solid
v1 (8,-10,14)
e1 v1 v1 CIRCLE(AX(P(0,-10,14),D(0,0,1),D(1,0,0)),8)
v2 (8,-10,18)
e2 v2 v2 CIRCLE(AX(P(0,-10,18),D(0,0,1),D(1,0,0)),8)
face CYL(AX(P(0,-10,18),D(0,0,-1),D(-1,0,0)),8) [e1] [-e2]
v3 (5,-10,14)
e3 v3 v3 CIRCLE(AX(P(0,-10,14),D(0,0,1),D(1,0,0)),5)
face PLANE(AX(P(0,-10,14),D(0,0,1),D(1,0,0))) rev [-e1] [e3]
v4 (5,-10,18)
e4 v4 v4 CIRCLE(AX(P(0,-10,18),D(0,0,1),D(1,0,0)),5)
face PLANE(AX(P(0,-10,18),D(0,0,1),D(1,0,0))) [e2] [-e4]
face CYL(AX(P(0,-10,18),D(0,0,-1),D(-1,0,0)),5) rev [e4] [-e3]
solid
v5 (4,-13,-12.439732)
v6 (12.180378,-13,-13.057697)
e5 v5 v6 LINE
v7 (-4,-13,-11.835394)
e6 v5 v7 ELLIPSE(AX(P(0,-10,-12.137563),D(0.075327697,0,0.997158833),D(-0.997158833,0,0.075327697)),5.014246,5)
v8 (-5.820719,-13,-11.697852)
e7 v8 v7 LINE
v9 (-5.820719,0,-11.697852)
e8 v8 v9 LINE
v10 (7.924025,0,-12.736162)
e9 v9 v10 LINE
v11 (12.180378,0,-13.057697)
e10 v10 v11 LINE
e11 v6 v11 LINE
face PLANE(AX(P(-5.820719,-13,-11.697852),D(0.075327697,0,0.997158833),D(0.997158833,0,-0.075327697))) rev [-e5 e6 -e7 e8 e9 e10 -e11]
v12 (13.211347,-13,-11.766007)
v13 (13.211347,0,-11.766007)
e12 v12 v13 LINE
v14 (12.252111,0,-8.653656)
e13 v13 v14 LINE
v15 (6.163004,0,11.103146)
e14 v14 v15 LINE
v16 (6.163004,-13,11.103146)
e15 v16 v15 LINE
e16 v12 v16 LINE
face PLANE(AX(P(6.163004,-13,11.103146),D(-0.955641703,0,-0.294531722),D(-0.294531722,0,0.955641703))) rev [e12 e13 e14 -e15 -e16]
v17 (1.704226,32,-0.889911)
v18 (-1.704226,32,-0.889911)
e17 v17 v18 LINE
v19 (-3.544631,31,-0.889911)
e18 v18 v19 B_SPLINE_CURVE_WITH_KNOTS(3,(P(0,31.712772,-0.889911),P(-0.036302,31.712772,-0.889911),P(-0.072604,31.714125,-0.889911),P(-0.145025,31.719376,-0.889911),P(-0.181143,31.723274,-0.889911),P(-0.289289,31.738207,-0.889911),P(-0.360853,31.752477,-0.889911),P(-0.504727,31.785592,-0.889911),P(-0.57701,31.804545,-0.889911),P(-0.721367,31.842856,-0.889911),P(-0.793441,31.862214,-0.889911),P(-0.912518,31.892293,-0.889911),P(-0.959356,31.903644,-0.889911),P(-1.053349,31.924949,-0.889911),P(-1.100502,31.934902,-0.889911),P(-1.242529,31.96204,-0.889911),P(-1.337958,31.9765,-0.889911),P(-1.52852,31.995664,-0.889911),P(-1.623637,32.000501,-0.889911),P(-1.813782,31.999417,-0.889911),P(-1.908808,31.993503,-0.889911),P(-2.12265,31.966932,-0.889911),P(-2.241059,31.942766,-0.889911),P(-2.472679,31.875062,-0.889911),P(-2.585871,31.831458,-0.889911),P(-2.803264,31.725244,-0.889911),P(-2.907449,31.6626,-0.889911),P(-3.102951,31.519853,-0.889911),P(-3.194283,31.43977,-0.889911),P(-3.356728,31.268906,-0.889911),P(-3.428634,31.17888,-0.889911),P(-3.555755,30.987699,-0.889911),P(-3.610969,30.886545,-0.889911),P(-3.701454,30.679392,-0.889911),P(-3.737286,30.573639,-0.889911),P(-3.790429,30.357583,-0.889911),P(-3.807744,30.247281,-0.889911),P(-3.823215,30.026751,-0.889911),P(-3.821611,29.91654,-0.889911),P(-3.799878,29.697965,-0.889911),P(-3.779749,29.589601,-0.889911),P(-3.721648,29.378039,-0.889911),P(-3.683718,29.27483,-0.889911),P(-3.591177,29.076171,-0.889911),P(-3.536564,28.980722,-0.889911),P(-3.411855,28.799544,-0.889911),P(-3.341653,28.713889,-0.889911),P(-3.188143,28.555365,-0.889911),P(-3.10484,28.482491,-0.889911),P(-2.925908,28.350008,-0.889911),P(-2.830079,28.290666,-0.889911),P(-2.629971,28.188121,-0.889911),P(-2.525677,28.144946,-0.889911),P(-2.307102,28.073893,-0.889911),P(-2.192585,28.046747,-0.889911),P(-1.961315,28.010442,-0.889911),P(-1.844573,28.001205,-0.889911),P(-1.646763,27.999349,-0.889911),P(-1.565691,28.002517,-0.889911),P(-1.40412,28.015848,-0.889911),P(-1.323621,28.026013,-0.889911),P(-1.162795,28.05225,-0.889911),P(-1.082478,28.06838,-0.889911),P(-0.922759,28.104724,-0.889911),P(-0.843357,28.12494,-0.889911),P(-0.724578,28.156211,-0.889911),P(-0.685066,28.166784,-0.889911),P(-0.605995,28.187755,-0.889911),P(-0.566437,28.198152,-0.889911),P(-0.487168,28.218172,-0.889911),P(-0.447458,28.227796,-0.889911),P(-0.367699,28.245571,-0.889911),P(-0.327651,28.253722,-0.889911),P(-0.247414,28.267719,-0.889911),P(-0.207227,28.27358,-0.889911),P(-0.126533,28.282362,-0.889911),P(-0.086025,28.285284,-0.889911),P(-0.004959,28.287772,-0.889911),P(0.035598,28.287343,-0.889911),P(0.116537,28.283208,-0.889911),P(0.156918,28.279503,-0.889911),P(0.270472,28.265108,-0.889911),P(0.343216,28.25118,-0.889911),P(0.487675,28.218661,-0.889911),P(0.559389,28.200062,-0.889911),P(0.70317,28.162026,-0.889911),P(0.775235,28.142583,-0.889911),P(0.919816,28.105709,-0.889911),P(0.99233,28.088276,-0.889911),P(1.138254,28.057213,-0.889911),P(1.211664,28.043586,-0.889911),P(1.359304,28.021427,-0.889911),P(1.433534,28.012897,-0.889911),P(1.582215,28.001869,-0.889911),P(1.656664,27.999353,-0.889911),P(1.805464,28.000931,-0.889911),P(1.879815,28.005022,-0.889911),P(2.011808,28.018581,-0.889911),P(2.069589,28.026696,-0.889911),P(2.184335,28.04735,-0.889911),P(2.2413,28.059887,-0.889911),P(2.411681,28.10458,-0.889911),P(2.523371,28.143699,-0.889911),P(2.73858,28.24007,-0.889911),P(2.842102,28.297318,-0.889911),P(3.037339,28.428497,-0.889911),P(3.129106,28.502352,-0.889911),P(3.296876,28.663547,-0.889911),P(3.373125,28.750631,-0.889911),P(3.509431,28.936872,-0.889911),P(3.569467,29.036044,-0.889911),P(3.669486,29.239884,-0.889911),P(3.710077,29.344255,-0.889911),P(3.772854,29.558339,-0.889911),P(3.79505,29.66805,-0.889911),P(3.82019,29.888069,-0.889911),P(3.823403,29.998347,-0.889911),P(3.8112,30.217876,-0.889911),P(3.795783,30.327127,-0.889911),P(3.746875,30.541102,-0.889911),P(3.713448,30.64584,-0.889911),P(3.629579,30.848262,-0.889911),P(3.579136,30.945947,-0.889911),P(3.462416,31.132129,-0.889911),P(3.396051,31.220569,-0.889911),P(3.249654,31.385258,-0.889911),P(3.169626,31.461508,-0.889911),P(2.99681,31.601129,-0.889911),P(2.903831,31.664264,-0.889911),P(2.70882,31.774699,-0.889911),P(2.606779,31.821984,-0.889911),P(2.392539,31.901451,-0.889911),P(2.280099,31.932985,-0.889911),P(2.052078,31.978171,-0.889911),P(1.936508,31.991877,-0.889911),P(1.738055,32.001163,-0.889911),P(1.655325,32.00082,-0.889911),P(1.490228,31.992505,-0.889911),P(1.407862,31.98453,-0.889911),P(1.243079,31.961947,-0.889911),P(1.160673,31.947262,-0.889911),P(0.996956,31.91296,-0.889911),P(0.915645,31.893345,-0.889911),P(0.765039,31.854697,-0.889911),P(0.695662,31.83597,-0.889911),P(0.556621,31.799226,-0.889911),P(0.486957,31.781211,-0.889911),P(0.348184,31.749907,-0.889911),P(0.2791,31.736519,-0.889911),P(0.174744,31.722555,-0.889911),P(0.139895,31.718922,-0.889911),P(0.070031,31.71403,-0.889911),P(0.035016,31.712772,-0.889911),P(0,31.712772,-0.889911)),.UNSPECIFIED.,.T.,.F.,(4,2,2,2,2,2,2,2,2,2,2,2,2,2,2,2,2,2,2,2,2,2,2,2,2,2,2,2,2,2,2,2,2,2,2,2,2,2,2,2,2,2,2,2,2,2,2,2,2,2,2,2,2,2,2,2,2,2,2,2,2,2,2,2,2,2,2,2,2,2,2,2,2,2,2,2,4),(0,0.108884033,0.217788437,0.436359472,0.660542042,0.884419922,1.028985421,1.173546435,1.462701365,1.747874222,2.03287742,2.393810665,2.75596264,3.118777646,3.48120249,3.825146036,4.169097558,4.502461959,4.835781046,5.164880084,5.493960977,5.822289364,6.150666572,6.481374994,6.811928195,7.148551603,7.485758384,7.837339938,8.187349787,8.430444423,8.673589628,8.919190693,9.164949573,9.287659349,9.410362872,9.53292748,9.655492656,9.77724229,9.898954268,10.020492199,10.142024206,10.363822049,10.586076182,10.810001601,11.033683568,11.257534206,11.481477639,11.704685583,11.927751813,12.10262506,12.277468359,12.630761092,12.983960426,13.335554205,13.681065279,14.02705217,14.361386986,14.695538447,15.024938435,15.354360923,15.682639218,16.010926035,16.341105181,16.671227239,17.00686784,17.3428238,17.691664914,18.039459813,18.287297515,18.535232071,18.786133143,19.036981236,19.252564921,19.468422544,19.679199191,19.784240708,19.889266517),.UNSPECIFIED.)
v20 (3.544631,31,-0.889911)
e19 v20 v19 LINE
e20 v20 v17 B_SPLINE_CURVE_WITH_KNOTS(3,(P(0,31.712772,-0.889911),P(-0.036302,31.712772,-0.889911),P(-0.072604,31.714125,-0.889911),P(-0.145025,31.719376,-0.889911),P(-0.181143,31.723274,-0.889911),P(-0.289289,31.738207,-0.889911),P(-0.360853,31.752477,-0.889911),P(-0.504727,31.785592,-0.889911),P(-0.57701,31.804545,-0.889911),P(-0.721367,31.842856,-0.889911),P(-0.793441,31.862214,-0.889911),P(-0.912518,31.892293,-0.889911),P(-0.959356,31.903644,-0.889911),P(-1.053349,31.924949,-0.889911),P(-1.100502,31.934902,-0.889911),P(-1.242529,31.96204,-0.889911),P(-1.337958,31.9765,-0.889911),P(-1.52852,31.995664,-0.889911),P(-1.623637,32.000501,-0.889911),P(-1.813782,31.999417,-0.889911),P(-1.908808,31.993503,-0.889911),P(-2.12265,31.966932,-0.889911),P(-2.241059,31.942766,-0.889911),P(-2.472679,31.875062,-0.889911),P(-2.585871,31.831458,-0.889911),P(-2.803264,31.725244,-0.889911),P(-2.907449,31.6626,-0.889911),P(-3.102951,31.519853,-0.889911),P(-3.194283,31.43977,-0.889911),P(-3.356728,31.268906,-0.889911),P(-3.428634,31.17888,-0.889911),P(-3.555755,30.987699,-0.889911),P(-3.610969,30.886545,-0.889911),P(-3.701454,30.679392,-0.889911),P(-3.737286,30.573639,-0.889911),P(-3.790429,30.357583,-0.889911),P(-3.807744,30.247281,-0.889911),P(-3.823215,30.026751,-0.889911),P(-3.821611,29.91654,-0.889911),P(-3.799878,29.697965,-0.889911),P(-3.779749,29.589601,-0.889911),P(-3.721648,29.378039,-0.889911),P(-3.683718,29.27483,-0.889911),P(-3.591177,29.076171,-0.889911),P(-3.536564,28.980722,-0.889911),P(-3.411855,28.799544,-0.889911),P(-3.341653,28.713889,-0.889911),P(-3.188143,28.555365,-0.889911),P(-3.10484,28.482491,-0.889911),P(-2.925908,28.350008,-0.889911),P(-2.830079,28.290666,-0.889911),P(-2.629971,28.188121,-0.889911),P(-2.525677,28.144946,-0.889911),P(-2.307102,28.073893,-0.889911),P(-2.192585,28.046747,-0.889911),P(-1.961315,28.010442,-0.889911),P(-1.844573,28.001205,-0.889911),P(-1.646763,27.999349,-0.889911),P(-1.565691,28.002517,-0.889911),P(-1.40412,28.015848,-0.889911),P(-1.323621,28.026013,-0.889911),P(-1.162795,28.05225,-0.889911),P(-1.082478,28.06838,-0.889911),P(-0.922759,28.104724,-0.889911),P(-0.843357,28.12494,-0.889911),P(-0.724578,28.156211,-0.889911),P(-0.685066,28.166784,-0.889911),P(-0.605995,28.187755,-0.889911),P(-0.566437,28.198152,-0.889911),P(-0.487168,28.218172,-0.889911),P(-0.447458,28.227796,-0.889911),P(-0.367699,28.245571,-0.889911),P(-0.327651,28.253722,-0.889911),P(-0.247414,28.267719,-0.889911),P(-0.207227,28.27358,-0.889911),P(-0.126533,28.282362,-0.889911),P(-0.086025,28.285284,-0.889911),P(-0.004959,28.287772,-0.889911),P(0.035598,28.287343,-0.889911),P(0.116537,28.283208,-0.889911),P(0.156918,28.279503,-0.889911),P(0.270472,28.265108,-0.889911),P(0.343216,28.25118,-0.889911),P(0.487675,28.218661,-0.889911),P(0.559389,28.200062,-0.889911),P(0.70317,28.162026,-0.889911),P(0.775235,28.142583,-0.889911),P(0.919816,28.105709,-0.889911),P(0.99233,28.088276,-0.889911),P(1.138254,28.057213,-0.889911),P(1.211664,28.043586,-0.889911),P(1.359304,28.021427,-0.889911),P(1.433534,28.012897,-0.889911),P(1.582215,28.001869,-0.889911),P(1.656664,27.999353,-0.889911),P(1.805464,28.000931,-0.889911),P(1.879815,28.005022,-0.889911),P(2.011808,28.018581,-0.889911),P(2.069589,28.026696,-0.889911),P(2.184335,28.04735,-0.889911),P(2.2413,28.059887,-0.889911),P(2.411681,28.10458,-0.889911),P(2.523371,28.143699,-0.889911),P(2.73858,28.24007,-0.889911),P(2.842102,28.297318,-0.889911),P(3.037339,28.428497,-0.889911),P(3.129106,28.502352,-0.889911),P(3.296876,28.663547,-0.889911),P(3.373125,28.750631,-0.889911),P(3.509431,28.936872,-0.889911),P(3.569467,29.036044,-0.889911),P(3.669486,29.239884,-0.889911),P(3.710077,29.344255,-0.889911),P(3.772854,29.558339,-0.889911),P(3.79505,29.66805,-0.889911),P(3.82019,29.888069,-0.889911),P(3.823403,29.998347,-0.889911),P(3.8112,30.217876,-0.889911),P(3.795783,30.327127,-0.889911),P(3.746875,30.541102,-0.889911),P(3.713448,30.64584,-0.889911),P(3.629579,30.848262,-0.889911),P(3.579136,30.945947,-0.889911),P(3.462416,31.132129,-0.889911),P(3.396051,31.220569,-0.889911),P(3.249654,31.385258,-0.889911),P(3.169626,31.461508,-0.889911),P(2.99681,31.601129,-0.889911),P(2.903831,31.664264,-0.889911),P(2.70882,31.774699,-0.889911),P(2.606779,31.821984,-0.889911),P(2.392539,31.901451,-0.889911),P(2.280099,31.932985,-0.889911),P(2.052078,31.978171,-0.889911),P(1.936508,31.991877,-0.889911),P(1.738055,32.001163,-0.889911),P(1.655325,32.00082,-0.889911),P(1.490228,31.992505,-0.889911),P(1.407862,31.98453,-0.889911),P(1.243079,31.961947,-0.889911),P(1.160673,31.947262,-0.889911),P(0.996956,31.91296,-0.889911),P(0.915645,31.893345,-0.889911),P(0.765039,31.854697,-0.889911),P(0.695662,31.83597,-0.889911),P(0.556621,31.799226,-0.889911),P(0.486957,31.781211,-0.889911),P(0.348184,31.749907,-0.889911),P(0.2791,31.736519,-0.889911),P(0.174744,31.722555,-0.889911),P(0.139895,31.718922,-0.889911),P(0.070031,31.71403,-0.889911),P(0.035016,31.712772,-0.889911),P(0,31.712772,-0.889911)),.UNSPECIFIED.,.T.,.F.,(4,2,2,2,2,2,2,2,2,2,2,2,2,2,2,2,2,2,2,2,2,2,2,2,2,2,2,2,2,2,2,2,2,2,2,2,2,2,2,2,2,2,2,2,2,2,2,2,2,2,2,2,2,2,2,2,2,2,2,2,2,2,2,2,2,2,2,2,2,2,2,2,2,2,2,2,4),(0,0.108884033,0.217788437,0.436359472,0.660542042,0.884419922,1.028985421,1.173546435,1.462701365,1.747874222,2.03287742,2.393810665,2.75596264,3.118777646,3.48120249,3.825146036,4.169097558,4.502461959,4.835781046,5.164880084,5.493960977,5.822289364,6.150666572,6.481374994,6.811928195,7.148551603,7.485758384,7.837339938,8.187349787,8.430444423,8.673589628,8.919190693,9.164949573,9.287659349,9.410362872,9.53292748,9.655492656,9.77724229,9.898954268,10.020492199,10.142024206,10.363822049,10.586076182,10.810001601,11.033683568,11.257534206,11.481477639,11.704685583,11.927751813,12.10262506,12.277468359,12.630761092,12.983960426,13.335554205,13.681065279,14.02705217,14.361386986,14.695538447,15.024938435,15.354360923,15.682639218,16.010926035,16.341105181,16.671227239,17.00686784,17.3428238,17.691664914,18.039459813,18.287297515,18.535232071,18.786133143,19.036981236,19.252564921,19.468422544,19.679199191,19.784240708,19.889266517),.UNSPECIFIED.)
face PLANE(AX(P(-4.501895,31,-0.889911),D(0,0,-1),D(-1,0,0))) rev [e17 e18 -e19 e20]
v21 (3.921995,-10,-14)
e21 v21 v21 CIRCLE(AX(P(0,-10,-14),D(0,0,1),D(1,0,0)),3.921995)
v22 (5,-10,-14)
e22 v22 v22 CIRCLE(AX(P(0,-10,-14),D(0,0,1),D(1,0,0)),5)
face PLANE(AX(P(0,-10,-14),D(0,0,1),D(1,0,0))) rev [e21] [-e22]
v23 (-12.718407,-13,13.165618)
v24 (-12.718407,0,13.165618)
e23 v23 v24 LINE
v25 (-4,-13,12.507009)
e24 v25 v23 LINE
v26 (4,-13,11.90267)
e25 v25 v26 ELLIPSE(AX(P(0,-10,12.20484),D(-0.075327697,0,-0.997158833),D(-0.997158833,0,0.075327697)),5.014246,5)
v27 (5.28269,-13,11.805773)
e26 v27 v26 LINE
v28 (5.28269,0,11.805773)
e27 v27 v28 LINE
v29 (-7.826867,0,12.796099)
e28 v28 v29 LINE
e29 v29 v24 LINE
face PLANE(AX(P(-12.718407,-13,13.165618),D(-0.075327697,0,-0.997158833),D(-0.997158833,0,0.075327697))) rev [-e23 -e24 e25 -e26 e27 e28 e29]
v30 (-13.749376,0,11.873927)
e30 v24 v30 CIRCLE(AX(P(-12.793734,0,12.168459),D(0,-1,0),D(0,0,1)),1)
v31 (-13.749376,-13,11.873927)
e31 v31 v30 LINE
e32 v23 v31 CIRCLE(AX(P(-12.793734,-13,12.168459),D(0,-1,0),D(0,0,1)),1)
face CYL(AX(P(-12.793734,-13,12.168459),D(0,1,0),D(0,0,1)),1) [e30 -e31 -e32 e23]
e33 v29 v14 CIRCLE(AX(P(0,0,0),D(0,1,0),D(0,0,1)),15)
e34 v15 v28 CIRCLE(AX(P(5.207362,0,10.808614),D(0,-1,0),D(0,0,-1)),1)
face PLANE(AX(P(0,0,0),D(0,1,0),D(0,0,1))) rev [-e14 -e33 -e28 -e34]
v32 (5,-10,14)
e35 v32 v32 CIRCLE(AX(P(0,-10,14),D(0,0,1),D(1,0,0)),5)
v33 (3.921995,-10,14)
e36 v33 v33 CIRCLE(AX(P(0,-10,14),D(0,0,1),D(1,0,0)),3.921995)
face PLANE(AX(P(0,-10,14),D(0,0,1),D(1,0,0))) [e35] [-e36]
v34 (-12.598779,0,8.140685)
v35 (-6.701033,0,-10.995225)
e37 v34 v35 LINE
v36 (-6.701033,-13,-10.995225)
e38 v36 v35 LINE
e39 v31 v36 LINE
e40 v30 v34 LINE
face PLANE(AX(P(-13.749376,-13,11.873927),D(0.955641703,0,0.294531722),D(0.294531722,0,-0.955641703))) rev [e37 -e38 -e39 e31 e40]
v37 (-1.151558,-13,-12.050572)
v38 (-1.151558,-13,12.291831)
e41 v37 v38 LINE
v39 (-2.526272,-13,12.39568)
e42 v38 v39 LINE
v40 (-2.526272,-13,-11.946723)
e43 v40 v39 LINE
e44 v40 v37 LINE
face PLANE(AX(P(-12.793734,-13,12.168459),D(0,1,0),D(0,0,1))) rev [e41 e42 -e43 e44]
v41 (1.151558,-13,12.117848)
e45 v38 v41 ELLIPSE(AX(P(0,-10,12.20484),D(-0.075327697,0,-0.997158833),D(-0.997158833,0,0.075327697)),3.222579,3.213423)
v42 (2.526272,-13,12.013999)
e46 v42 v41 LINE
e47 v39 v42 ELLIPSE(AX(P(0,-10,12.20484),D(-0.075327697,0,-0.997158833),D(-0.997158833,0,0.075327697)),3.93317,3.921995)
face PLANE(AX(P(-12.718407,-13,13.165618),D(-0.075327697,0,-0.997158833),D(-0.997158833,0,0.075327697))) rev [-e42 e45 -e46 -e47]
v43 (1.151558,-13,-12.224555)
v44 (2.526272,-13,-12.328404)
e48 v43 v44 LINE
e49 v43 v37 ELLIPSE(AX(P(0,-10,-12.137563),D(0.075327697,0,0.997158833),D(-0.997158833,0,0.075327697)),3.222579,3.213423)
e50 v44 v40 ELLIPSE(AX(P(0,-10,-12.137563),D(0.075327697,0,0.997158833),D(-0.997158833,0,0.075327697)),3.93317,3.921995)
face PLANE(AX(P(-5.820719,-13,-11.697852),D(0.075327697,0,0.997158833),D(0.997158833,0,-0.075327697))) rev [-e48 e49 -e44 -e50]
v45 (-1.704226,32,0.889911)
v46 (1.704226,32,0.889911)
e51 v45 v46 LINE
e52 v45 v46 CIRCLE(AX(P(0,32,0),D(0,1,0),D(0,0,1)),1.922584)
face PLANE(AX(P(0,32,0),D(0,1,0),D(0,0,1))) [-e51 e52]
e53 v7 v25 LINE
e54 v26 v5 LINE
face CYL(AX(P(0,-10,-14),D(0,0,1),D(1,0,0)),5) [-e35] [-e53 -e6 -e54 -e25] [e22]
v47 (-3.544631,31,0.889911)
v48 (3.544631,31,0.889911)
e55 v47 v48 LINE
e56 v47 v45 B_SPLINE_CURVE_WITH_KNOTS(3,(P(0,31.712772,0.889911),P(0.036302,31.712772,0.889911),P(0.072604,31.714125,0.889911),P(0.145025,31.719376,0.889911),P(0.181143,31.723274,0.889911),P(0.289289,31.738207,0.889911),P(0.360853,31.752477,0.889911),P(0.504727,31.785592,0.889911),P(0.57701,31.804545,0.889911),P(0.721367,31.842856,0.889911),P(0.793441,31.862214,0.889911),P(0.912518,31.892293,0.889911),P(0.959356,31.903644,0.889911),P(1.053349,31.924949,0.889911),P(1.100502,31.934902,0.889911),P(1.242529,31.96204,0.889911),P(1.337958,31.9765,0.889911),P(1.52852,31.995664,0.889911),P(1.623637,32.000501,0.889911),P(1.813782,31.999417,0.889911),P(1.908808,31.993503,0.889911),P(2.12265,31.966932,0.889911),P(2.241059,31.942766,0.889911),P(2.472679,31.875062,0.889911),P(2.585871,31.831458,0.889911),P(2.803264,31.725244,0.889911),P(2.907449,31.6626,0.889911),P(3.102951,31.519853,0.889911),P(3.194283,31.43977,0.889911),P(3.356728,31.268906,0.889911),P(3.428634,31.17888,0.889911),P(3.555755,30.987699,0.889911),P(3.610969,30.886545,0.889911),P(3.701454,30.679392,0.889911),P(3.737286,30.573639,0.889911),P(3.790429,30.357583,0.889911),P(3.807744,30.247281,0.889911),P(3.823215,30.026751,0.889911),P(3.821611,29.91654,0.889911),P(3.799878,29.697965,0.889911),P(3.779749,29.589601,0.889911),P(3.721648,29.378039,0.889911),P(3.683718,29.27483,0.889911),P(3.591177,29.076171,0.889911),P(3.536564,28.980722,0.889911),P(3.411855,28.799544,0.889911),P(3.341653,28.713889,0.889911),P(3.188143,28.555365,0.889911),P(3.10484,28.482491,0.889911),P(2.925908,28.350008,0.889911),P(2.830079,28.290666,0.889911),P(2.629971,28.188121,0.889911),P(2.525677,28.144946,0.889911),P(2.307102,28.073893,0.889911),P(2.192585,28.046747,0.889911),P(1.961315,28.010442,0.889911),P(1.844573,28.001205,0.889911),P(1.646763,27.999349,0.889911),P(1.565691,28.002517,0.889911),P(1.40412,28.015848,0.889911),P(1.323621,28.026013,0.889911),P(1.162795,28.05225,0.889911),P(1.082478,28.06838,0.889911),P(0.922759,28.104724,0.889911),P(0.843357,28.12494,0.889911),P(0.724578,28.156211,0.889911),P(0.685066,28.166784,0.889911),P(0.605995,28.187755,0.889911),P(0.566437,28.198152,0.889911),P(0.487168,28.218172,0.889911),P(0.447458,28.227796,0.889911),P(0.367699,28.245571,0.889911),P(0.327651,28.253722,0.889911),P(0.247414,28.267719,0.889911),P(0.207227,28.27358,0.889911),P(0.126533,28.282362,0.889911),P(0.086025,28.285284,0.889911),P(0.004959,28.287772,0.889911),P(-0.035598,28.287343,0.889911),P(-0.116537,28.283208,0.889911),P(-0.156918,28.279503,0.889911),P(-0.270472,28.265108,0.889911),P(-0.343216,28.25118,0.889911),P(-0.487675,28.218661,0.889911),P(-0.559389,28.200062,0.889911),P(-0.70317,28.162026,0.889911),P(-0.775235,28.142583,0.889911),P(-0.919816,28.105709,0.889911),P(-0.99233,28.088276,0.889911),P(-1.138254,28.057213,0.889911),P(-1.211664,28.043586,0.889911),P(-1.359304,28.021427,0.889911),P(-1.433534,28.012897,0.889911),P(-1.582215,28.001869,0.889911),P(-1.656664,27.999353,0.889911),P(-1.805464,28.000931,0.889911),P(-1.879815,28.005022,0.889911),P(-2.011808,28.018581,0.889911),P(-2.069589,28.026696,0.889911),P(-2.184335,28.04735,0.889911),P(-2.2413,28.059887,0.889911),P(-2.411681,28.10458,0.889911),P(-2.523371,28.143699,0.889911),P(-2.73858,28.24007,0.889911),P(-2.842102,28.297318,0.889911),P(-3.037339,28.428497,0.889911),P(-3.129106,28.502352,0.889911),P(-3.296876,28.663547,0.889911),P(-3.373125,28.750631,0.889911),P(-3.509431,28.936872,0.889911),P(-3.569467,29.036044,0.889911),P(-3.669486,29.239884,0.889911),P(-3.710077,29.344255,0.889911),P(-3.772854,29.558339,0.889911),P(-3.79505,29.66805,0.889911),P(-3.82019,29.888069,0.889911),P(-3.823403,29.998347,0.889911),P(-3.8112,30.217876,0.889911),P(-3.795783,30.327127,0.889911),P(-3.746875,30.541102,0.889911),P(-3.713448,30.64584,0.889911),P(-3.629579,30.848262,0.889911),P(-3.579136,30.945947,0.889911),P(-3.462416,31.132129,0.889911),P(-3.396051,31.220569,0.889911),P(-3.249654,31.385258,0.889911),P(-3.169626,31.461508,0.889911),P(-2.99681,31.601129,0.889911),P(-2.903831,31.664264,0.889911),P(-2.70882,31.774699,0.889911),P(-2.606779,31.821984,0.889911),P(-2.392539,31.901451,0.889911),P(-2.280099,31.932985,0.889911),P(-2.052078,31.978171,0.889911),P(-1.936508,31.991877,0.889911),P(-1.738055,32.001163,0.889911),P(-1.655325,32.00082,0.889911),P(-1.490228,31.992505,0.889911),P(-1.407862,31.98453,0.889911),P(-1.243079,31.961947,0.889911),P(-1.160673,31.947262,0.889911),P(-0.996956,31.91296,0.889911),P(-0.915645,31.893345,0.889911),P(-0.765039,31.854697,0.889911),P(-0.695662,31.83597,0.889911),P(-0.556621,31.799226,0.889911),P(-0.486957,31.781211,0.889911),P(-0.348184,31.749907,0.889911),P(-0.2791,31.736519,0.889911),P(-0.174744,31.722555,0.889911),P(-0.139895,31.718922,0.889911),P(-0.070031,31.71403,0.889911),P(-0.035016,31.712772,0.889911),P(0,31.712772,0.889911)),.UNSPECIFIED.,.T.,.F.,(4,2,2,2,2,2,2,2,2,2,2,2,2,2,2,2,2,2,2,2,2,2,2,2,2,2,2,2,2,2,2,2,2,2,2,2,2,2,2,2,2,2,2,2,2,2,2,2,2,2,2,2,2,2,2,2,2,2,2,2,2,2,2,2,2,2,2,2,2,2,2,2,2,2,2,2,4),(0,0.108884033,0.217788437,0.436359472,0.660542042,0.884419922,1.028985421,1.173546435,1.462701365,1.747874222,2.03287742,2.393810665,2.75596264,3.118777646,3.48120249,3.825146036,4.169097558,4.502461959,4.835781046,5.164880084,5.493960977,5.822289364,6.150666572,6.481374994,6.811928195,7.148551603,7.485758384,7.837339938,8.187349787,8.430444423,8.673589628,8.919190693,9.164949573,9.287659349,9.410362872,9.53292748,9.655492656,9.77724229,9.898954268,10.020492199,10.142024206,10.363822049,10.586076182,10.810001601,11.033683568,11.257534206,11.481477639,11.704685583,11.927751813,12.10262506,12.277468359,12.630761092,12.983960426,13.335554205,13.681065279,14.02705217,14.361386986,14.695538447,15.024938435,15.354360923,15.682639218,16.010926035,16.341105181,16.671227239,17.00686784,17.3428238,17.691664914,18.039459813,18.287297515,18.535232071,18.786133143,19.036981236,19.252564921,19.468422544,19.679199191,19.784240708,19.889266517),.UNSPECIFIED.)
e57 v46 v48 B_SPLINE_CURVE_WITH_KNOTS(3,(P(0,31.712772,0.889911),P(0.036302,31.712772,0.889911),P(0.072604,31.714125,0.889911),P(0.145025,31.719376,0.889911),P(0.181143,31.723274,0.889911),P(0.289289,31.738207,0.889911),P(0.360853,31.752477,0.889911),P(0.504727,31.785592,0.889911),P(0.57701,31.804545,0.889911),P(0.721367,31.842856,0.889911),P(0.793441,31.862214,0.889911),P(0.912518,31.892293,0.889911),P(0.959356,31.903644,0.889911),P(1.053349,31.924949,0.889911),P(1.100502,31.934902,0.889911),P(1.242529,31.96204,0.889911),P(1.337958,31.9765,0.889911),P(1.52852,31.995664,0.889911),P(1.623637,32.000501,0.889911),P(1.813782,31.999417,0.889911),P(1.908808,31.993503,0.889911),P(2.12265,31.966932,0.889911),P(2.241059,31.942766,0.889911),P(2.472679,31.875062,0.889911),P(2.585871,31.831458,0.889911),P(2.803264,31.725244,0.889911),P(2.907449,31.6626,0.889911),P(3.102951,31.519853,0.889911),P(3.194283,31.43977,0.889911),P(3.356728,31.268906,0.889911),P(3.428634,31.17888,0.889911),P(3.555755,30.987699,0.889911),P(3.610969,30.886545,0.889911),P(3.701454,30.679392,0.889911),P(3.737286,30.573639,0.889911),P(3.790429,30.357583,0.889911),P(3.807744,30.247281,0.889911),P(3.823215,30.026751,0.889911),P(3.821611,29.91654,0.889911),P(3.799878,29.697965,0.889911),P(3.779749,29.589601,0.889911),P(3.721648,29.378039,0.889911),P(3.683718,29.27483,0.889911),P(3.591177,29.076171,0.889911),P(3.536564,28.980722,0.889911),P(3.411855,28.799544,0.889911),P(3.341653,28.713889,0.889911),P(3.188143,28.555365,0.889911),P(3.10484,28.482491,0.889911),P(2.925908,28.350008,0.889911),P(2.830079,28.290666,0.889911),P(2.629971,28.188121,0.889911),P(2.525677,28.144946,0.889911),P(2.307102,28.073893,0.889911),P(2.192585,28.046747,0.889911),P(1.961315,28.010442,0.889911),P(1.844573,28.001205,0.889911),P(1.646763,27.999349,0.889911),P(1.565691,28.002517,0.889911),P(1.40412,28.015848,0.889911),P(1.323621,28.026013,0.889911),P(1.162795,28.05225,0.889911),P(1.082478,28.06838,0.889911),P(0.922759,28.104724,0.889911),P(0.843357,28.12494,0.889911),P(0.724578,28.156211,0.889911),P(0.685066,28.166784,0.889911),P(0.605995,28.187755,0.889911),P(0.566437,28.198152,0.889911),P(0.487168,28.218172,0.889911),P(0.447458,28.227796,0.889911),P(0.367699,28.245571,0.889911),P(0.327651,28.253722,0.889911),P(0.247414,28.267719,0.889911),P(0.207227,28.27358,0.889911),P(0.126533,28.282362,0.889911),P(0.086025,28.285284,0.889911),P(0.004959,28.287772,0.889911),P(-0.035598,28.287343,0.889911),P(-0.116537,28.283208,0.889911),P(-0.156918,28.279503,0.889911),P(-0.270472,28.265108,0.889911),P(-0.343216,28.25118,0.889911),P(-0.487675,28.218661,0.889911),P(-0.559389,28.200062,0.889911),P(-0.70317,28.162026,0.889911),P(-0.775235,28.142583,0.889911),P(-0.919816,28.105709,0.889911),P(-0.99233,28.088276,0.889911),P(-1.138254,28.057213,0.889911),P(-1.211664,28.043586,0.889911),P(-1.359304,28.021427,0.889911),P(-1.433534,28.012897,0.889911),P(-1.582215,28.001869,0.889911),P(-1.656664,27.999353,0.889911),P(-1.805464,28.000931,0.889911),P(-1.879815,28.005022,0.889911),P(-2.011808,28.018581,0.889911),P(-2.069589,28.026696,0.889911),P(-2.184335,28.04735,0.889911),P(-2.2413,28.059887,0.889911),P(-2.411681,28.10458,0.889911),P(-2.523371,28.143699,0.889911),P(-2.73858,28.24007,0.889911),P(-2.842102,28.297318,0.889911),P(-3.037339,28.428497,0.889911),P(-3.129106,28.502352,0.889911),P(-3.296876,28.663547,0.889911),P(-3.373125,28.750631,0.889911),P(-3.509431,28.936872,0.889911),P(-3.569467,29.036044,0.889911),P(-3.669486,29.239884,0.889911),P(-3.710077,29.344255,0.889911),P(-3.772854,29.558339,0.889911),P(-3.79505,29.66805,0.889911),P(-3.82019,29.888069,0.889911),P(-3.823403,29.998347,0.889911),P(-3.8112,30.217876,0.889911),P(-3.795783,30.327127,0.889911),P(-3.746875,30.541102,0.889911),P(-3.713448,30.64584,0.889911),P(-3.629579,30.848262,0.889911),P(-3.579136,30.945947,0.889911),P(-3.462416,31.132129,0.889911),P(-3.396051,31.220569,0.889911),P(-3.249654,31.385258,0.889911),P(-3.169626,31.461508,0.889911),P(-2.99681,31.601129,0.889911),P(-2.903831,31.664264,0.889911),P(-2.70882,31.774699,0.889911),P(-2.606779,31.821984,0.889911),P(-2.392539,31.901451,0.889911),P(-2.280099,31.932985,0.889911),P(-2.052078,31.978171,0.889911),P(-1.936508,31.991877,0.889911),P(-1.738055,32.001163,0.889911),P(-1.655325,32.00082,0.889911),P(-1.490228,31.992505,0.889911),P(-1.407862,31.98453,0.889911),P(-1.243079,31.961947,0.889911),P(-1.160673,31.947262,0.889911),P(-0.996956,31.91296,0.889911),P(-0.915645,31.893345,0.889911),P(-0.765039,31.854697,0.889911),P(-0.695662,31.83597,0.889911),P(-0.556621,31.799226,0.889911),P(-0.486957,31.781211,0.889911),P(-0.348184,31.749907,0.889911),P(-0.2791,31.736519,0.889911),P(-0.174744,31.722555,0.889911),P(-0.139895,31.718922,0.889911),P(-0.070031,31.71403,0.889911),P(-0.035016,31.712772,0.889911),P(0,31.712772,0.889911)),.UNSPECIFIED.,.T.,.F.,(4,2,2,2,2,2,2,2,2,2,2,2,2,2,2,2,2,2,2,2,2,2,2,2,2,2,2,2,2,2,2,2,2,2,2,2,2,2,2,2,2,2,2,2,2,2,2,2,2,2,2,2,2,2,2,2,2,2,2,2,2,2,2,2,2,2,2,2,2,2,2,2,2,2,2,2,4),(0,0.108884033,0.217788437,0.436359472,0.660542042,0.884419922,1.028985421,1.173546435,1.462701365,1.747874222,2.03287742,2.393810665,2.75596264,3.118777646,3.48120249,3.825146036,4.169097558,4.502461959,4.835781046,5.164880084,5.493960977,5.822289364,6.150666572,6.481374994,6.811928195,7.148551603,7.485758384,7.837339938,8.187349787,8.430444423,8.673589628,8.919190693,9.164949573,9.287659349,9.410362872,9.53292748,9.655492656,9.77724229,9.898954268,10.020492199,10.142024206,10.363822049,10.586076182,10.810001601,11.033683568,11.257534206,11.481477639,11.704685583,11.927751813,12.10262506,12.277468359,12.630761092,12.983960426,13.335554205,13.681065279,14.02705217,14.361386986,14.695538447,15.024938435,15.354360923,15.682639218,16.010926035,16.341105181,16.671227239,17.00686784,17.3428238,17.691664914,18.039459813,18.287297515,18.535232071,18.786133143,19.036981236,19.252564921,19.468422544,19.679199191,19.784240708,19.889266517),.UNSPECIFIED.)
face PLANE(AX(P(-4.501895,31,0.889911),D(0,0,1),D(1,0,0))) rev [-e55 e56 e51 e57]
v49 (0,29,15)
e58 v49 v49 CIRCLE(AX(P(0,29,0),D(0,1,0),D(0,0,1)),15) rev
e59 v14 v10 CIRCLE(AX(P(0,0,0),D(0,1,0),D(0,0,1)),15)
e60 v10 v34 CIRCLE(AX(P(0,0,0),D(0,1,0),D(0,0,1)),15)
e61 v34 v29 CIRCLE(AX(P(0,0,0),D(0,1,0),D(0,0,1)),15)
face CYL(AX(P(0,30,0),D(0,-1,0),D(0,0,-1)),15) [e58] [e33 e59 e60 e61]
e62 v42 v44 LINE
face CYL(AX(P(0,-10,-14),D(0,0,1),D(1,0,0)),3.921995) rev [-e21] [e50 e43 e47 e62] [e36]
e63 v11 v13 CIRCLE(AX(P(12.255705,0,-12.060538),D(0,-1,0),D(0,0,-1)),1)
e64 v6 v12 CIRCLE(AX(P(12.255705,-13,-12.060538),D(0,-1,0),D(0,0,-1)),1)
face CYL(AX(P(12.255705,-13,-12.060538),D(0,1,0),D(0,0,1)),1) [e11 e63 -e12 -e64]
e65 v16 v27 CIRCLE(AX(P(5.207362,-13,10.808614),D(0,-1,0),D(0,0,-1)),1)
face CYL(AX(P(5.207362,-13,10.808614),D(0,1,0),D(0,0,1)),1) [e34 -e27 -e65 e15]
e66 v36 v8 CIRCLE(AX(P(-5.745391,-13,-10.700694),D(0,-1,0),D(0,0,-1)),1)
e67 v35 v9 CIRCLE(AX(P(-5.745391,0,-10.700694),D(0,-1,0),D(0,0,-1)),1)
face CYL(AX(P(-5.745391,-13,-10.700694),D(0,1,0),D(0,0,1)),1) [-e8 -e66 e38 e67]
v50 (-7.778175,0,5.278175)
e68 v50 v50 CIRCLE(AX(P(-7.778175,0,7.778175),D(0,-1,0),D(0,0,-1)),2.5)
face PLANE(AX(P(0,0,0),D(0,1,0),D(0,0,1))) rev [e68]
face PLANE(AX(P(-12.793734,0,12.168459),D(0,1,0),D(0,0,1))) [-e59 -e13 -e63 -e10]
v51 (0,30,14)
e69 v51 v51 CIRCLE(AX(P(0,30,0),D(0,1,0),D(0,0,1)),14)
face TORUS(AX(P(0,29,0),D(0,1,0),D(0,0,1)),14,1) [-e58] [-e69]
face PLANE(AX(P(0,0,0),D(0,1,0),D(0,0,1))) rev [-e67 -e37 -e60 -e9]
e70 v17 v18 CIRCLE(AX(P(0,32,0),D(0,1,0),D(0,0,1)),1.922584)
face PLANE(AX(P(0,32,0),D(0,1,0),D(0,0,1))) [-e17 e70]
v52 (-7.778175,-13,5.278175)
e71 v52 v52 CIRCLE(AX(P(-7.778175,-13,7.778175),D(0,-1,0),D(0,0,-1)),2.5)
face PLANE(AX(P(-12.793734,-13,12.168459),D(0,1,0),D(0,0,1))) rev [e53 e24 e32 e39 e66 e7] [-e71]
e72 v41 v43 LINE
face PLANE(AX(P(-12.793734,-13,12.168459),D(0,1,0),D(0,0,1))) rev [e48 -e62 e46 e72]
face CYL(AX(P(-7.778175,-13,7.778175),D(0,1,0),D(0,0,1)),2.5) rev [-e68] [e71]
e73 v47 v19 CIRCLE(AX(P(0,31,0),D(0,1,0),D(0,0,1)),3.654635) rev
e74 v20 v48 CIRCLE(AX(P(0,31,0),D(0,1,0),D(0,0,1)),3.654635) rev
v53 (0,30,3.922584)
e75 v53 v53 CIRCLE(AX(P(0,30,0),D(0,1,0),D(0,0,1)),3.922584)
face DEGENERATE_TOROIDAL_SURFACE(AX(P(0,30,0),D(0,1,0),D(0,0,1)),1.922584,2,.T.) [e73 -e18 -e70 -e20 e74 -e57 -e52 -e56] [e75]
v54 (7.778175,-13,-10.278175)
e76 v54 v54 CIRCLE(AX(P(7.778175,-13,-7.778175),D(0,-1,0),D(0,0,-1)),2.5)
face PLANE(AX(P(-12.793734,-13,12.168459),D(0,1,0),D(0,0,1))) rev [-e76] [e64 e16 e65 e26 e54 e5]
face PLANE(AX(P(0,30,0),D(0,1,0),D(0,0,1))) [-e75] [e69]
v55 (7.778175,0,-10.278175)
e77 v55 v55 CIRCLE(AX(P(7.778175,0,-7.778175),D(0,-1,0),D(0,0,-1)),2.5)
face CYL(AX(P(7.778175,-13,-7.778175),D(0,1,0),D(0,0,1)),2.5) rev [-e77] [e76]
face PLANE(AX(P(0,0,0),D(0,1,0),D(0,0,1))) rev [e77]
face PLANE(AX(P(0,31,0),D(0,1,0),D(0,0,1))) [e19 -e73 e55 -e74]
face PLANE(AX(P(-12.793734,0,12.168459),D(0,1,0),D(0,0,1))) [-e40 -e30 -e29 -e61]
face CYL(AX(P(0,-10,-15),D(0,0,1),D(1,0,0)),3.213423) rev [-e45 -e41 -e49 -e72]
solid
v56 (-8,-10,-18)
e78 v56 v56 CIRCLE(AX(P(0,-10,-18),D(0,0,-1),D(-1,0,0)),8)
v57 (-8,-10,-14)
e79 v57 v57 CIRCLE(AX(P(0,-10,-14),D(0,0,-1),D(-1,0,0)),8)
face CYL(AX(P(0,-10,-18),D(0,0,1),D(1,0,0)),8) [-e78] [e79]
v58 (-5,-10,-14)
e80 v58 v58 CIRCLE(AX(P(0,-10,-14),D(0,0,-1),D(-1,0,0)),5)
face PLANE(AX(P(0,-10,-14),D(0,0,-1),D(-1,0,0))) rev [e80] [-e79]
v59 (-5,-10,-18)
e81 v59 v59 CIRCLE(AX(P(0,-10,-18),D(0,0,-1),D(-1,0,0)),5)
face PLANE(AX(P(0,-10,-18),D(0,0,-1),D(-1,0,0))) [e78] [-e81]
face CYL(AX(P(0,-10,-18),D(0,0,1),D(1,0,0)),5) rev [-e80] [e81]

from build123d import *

# Parameters (mm, degrees)
SKETCH1_R           = 15
BOSS_EXTRUDE1_DEPTH = 30
SKETCH2_R           = 2.5
BOSS_EXTRUDE2_DEPTH = 13
SKETCH3_R           = 5
SKETCH3_R_2         = 3.92199541
BOSS_EXTRUDE3_DEPTH = 28
SKETCH4_R           = 3.213422936
CUT_EXTRUDE1_DEPTH  = 45.339598555
FILLET2_R           = 1
SKETCH5_R           = 8
SKETCH5_R_2         = 5
BOSS_EXTRUDE4_DEPTH = 4
SKETCH6_R           = 8
SKETCH6_R_2         = 5
BOSS_EXTRUDE6_DEPTH = 4
SKETCH8_R           = 3.922583836
BOSS_EXTRUDE7_DEPTH = 2
FILLET3_R           = 2
SKETCH9_W           = 8.867784407
SKETCH9_H           = 1.779822502
CUT_EXTRUDE3_DEPTH  = 1


with BuildPart() as part:
    # Sketch1 → Boss-Extrude1 (new body)
    with BuildSketch(Plane(origin=(0, 0, 0), x_dir=(1, 0, 0), z_dir=(0, 1, 0))):
        with Locations(Location((0, 0, 0), (0, 0, 270))):
            Circle(SKETCH1_R)
    extrude(amount=BOSS_EXTRUDE1_DEPTH)

    # Sketch2 → Boss-Extrude2 (add)
    with BuildSketch(Plane.XZ):
        with BuildLine():
            Line((-12.718406511, 13.165617512), (5.282689871, 11.805772831))
            ThreePointArc((5.282689871, 11.805772831), (5.831177604, 11.59018569), (6.163003877, 11.10314572))
            Line((6.163003877, 11.10314572), (13.211347203, -11.766006614))
            ThreePointArc((13.211347203, -11.766006614), (13.037277191, -12.684353766), (12.180377802, -13.057697169))
            Line((12.180377802, -13.057697169), (-5.82071858, -11.697852488))
            ThreePointArc((-5.82071858, -11.697852488), (-6.369206312, -11.482265347), (-6.701032586, -10.995225377))
            Line((-6.701032586, -10.995225377), (-13.749375911, 11.873926957))
            ThreePointArc((-13.749375911, 11.873926957), (-13.5753059, 12.792274109), (-12.718406511, 13.165617512))
        make_face()
        with Locations(Location((-7.778174593, 7.778174593, 0), (0, 0, 270))):
            Circle(SKETCH2_R, mode=Mode.SUBTRACT)
        with Locations(Location((7.778174593, -7.778174593, 0), (0, 0, 270))):
            Circle(SKETCH2_R, mode=Mode.SUBTRACT)
    extrude(amount=BOSS_EXTRUDE2_DEPTH)

    # Sketch3 → Boss-Extrude3 (add)
    with BuildSketch(Plane.XY.offset(14)):
        with Locations((0, -10)):
            Circle(SKETCH3_R)
        with Locations((0, -10)):
            Circle(SKETCH3_R_2, mode=Mode.SUBTRACT)
    extrude(amount=-BOSS_EXTRUDE3_DEPTH)

    # Sketch4 → Cut-Extrude1 (cut, through all)
    with BuildSketch(Plane.XY.offset(14)):
        with Locations((0, -10)):
            Circle(SKETCH4_R)
    extrude(amount=-CUT_EXTRUDE1_DEPTH, mode=Mode.SUBTRACT)

    # Fillet2
    fillet2_edges = [part.edges().sort_by_distance(p)[0] for p in [
        (0, 30, -15),
    ]]
    fillet(fillet2_edges, radius=FILLET2_R)

    # Sketch8 → Boss-Extrude7 (add)
    with BuildSketch(Plane(origin=(0, 30, 0), x_dir=(1, 0, 0), z_dir=(0, 1, 0))):
        with Locations(Location((0, 0, 0), (0, 0, 270))):
            Circle(SKETCH8_R)
    extrude(amount=BOSS_EXTRUDE7_DEPTH)

    # Fillet3
    fillet3_edges = [part.edges().sort_by_distance(p)[0] for p in [
        (0, 32, -3.922583836),
    ]]
    fillet(fillet3_edges, radius=FILLET3_R - 0.0001)  # a hair under: the kernel refuses the full size

    # Sketch9 → Cut-Extrude3 (cut)
    with BuildSketch(Plane(origin=(0, 32, 0), x_dir=(1, 0, 0), z_dir=(0, 1, 0))):
        with Locations((-0.068002485, 0)):
            Rectangle(SKETCH9_W, SKETCH9_H)
    extrude(amount=-CUT_EXTRUDE3_DEPTH, mode=Mode.SUBTRACT)


with BuildPart() as body_2:
    # Sketch5 → Boss-Extrude4 (new body)
    with BuildSketch(Plane(origin=(0, 0, -14), x_dir=(-1, 0, 0), z_dir=(0, 0, -1))):
        with Locations((0, -10)):
            Circle(SKETCH5_R)
        with Locations((0, -10)):
            Circle(SKETCH5_R_2, mode=Mode.SUBTRACT)
    extrude(amount=BOSS_EXTRUDE4_DEPTH)


with BuildPart() as body_3:
    # Sketch6 → Boss-Extrude6 (new body)
    with BuildSketch(Plane.XY.offset(14)):
        with Locations((0, -10)):
            Circle(SKETCH6_R)
        with Locations((0, -10)):
            Circle(SKETCH6_R_2, mode=Mode.SUBTRACT)
    extrude(amount=BOSS_EXTRUDE6_DEPTH)


solid = Compound([part.part, body_2.part, body_3.part])
